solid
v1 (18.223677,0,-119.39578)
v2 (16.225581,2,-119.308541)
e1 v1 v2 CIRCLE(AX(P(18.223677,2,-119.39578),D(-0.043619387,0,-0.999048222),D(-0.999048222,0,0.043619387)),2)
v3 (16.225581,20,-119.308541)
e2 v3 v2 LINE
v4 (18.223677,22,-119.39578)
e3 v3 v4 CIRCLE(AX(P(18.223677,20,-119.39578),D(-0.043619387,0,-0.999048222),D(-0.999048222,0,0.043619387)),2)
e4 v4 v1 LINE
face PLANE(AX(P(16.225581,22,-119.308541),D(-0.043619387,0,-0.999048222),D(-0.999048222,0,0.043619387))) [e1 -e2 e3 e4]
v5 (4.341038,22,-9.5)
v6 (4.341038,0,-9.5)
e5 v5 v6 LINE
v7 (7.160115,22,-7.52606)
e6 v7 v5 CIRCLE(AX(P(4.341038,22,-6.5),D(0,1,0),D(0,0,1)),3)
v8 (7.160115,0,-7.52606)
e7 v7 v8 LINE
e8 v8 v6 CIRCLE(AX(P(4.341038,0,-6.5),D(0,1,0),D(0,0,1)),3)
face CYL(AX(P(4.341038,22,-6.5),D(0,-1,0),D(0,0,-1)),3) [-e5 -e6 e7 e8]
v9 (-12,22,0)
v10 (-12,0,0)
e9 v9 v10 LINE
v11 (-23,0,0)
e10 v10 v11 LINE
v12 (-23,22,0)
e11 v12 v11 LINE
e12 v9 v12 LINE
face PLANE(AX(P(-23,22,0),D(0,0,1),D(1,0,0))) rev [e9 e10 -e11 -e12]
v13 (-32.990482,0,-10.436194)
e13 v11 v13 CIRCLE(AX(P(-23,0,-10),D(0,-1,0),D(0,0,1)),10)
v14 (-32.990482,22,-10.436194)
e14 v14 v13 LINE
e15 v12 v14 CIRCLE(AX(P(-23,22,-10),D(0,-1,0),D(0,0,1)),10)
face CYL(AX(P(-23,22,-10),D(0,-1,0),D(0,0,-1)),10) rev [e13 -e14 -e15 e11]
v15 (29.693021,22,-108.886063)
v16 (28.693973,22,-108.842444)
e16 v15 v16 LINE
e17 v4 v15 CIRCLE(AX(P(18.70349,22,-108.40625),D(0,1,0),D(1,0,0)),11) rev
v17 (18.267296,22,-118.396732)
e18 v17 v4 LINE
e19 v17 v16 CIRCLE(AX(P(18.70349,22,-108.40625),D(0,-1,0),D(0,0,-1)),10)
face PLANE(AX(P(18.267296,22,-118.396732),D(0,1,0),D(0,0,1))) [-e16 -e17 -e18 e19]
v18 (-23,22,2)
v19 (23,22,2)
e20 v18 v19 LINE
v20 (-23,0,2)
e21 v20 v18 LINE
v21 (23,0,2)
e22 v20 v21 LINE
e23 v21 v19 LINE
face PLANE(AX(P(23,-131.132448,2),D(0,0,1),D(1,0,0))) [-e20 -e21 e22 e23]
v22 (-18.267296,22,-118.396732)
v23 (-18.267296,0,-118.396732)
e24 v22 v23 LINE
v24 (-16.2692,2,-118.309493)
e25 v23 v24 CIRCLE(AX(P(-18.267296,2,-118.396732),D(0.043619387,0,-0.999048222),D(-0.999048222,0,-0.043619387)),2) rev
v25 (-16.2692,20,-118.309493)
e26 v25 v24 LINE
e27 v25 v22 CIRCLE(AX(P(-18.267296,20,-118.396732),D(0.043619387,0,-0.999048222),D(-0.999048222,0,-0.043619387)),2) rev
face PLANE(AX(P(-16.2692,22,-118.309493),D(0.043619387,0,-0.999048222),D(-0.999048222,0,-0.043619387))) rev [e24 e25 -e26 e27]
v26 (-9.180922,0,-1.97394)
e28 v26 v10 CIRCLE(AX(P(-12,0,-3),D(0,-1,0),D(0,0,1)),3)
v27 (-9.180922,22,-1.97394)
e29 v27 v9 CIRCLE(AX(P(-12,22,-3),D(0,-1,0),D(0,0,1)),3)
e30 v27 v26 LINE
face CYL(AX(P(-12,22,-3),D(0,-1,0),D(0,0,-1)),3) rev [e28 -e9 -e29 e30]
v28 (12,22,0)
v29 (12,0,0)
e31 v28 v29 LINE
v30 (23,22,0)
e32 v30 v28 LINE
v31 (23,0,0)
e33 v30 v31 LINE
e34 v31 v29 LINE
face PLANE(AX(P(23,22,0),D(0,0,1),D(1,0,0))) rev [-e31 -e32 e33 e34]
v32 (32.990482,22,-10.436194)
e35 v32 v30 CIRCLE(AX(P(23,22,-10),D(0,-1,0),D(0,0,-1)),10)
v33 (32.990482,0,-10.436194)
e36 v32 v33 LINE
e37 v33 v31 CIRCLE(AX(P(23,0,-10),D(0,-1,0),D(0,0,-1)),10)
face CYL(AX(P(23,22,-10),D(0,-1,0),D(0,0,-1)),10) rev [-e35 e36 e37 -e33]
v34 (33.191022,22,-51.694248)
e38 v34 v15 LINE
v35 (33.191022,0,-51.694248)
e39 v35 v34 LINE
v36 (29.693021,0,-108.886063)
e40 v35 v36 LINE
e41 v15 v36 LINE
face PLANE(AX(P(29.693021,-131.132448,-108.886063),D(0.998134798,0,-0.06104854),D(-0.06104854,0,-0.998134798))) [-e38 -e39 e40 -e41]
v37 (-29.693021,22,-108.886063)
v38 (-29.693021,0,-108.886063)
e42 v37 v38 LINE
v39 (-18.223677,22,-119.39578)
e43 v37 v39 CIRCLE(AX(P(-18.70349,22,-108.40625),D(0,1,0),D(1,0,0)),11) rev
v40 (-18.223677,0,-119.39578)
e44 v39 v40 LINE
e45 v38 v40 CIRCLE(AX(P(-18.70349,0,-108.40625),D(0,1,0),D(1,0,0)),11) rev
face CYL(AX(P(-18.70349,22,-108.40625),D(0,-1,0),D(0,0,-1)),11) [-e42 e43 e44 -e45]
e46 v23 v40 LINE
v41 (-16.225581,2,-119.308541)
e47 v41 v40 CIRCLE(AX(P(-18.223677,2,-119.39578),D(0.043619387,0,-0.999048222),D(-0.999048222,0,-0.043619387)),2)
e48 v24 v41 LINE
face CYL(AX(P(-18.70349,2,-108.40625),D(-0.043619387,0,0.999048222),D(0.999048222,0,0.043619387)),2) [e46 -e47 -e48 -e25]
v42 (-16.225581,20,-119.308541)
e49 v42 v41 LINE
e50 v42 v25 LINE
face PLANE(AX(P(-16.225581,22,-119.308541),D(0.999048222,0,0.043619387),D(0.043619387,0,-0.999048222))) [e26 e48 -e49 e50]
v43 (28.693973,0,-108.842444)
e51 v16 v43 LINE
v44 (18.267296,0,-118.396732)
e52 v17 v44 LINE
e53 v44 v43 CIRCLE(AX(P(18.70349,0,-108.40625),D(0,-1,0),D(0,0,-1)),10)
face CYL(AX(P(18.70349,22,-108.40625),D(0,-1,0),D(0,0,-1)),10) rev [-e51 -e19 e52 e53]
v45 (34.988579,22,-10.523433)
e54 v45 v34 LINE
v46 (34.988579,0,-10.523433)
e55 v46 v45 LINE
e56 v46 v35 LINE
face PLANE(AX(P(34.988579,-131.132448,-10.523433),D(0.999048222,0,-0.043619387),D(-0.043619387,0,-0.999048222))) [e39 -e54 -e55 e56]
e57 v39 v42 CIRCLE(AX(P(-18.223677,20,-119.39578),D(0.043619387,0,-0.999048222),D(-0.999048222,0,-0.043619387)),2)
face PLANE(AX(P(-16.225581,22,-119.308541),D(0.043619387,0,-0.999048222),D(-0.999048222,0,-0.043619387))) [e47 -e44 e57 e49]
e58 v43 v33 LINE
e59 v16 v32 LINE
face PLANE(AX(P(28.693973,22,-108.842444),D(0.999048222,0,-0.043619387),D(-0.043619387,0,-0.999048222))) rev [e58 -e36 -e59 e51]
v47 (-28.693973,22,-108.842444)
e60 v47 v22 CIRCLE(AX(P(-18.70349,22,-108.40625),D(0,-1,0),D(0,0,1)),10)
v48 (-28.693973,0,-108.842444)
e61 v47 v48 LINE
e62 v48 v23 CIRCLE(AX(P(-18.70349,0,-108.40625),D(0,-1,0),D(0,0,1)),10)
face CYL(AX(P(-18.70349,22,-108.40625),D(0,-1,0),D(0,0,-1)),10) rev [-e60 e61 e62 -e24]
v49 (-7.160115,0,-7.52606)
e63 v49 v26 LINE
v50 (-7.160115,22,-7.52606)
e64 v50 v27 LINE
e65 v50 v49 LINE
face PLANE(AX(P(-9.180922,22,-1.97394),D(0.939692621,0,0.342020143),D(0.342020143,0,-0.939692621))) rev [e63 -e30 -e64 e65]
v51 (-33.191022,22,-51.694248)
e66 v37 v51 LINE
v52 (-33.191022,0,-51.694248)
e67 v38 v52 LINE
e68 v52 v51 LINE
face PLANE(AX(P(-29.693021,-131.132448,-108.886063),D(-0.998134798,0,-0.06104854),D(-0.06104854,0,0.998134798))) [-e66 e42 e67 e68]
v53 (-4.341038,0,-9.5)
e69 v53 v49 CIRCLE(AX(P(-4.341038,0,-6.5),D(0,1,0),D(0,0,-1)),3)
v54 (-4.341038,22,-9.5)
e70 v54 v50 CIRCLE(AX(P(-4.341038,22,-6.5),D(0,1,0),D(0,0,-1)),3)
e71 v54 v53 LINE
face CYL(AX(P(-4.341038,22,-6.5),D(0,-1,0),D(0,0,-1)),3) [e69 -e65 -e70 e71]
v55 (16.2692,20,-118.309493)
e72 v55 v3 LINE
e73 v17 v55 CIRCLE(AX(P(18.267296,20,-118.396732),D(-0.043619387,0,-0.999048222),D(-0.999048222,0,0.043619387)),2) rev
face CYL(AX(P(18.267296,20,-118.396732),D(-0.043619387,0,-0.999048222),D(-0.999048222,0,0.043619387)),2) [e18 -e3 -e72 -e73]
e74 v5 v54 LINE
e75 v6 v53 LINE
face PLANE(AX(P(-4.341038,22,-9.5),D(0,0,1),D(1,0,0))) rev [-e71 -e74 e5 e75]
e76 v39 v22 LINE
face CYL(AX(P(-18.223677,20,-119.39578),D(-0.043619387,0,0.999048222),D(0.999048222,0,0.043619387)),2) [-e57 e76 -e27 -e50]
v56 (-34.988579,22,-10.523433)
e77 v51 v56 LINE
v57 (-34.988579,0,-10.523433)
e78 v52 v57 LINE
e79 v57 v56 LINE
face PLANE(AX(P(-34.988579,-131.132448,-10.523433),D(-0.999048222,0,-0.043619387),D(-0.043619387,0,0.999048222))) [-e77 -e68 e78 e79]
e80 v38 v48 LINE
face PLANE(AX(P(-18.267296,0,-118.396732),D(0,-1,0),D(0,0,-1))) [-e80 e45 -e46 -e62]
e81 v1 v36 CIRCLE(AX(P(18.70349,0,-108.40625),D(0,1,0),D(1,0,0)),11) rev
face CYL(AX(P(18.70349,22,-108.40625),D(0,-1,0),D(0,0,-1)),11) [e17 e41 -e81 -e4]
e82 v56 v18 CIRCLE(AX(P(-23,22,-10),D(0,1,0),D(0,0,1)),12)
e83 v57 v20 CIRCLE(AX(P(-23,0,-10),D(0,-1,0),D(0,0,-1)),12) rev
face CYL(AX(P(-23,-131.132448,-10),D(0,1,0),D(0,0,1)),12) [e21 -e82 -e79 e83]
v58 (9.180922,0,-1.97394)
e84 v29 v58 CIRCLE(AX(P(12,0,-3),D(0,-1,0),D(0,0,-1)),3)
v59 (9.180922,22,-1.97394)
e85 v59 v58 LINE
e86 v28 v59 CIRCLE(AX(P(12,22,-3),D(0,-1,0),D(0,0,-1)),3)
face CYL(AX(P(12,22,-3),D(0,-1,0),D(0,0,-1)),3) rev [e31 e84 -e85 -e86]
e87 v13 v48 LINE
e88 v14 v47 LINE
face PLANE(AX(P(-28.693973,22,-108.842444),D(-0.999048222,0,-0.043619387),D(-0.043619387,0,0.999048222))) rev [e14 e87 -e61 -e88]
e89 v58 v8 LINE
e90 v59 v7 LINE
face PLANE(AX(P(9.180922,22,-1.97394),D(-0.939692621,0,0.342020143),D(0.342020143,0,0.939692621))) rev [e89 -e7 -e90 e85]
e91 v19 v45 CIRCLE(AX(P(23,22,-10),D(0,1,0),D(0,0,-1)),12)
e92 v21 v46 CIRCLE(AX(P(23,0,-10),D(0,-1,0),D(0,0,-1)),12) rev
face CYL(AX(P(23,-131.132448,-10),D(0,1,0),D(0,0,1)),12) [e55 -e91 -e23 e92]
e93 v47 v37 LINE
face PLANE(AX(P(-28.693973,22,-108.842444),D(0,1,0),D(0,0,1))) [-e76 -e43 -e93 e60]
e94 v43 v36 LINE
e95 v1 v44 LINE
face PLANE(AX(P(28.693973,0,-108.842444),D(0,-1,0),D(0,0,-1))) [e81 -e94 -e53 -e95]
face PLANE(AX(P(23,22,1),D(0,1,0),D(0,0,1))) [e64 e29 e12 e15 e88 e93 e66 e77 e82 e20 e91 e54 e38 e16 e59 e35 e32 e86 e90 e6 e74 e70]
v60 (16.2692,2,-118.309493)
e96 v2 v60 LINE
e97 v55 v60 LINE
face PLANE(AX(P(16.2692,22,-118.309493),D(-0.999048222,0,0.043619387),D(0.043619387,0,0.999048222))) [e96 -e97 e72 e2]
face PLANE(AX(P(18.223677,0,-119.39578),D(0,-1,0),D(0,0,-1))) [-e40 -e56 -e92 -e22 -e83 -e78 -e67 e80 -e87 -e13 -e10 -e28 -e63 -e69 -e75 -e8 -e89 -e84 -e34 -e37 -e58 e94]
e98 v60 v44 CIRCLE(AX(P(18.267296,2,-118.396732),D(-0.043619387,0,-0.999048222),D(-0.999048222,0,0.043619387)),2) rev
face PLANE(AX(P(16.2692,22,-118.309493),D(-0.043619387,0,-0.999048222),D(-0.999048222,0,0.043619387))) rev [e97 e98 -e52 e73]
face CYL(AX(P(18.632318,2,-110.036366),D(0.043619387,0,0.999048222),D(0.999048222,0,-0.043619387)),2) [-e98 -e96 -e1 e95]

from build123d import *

# Parameters (mm, degrees)
T_LE_DE_BASE_PLI_E1_DEPTH = 22
CONG_1_R                  = 2
BOSS_EXTRU_1_START        = -22
BOSS_EXTRU_1_DEPTH        = 22


# Sheet-metal steps are written as plain solids
with BuildPart() as part:
    # Esquisse1 → Tôle de base pliée1 (new body)
    with BuildSketch(Plane(origin=(0, 0, 0), x_dir=(1, 0, 0), z_dir=(0, 1, 0))):
        with BuildLine():
            Line((-16.269200028, 118.309493267), (-18.267296471, 118.396732042))
            ThreePointArc((-18.267296471, 118.396732042), (-25.459392421, 115.779023194), (-28.69397256, 108.842443699))
            Line((-28.69397256, 108.842443699), (-32.990482216, 10.436193874))
            ThreePointArc((-32.990482216, 10.436193874), (-30.223639621, 3.084869442), (-23, 0))
            Line((-23, 0), (-12, 0))
            ThreePointArc((-12, 0), (-10.279270691, 0.542543867), (-9.180922138, 1.97393957))
            Line((-9.180922138, 1.97393957), (-7.160115408, 7.52606043))
            ThreePointArc((-7.160115408, 7.52606043), (-6.061766854, 8.957456133), (-4.341037545, 9.5))
            Line((-4.341037545, 9.5), (4.341037545, 9.5))
            ThreePointArc((4.341037545, 9.5), (6.061766854, 8.957456133), (7.160115408, 7.52606043))
            Line((7.160115408, 7.52606043), (9.180922138, 1.97393957))
            ThreePointArc((9.180922138, 1.97393957), (10.279270691, 0.542543867), (12, 0))
            Line((12, 0), (23, 0))
            ThreePointArc((23, 0), (30.223639621, 3.084869442), (32.990482216, 10.436193874))
            Line((32.990482216, 10.436193874), (28.69397256, 108.842443699))
            ThreePointArc((28.69397256, 108.842443699), (25.459392421, 115.779023194), (18.267296471, 118.396732042))
            Line((18.267296471, 118.396732042), (16.269200028, 118.309493267))
            Line((16.269200028, 118.309493267), (16.22558064, 119.308541488))
            Line((16.22558064, 119.308541488), (18.223677083, 119.395780263))
            ThreePointArc((18.223677083, 119.395780263), (26.134982628, 116.516300531), (29.693020782, 108.886063087))
            Line((29.693020782, 108.886063087), (33.989530437, 10.479813261))
            ThreePointArc((33.989530437, 10.479813261), (30.946003583, 2.393356386), (23, -1))
            Line((23, -1), (12, -1))
            ThreePointArc((12, -1), (9.705694255, -0.276608177), (8.241229517, 1.631919427))
            Line((8.241229517, 1.631919427), (6.220422787, 7.184040287))
            ThreePointArc((6.220422787, 7.184040287), (5.488190418, 8.138304089), (4.341037545, 8.5))
            Line((4.341037545, 8.5), (-4.341037545, 8.5))
            ThreePointArc((-4.341037545, 8.5), (-5.488190418, 8.138304089), (-6.220422787, 7.184040287))
            Line((-6.220422787, 7.184040287), (-8.241229517, 1.631919427))
            ThreePointArc((-8.241229517, 1.631919427), (-9.705694255, -0.276608177), (-12, -1))
            Line((-12, -1), (-23, -1))
            ThreePointArc((-23, -1), (-30.946003583, 2.393356386), (-33.989530437, 10.479813261))
            Line((-33.989530437, 10.479813261), (-29.693020782, 108.886063087))
            ThreePointArc((-29.693020782, 108.886063087), (-26.134982628, 116.516300531), (-18.223677083, 119.395780263))
            Line((-18.223677083, 119.395780263), (-16.22558064, 119.308541488))
            Line((-16.22558064, 119.308541488), (-16.269200028, 118.309493267))
        make_face()
    extrude(amount=T_LE_DE_BASE_PLI_E1_DEPTH)

    # Congé1
    cong_1_edges = [part.edges().sort_by_distance(p)[0] for p in [
        (16.247390334, 22, -118.809017378),
        (16.247390334, 0, -118.809017378),
        (-16.247390334, 0, -118.809017378),
        (-16.247390334, 22, -118.809017378),
    ]]
    fillet(cong_1_edges, radius=CONG_1_R)

    # Esquisse2 → Boss.-Extru.1 (add)
    with BuildSketch(Plane(origin=(0, 22, 0), x_dir=(1, 0, 0), z_dir=(0, 1, 0)).offset(BOSS_EXTRU_1_START)):
        with BuildLine():
            Line((-29.693020782, 108.886063087), (-33.191022032, 51.694248192))
            Line((-33.191022032, 51.694248192), (-34.988578659, 10.523432648))
            ThreePointArc((-34.988578659, 10.523432648), (-31.668367545, 1.701843331), (-23, -2))
            Line((-23, -2), (23, -2))
            ThreePointArc((23, -2), (31.668367545, 1.701843331), (34.988578659, 10.523432648))
            Line((34.988578659, 10.523432648), (33.191022032, 51.694248192))
            Line((33.191022032, 51.694248192), (29.693020782, 108.886063087))
            Line((29.693020782, 108.886063087), (33.989530437, 10.479813261))
            ThreePointArc((33.989530437, 10.479813261), (30.946003583, 2.393356386), (23, -1))
            Line((23, -1), (12, -1))
            ThreePointArc((12, -1), (9.705694255, -0.276608177), (8.241229517, 1.631919427))
            Line((8.241229517, 1.631919427), (6.220422787, 7.184040287))
            ThreePointArc((6.220422787, 7.184040287), (5.488190418, 8.138304089), (4.341037545, 8.5))
            Line((4.341037545, 8.5), (-4.341037545, 8.5))
            ThreePointArc((-4.341037545, 8.5), (-5.488190418, 8.138304089), (-6.220422787, 7.184040287))
            Line((-6.220422787, 7.184040287), (-8.241229517, 1.631919427))
            ThreePointArc((-8.241229517, 1.631919427), (-9.705694255, -0.276608177), (-12, -1))
            Line((-12, -1), (-23, -1))
            ThreePointArc((-23, -1), (-30.946003583, 2.393356386), (-33.989530437, 10.479813261))
            Line((-33.989530437, 10.479813261), (-29.693020782, 108.886063087))
        make_face()
    extrude(amount=BOSS_EXTRU_1_DEPTH)


solid = part.part
